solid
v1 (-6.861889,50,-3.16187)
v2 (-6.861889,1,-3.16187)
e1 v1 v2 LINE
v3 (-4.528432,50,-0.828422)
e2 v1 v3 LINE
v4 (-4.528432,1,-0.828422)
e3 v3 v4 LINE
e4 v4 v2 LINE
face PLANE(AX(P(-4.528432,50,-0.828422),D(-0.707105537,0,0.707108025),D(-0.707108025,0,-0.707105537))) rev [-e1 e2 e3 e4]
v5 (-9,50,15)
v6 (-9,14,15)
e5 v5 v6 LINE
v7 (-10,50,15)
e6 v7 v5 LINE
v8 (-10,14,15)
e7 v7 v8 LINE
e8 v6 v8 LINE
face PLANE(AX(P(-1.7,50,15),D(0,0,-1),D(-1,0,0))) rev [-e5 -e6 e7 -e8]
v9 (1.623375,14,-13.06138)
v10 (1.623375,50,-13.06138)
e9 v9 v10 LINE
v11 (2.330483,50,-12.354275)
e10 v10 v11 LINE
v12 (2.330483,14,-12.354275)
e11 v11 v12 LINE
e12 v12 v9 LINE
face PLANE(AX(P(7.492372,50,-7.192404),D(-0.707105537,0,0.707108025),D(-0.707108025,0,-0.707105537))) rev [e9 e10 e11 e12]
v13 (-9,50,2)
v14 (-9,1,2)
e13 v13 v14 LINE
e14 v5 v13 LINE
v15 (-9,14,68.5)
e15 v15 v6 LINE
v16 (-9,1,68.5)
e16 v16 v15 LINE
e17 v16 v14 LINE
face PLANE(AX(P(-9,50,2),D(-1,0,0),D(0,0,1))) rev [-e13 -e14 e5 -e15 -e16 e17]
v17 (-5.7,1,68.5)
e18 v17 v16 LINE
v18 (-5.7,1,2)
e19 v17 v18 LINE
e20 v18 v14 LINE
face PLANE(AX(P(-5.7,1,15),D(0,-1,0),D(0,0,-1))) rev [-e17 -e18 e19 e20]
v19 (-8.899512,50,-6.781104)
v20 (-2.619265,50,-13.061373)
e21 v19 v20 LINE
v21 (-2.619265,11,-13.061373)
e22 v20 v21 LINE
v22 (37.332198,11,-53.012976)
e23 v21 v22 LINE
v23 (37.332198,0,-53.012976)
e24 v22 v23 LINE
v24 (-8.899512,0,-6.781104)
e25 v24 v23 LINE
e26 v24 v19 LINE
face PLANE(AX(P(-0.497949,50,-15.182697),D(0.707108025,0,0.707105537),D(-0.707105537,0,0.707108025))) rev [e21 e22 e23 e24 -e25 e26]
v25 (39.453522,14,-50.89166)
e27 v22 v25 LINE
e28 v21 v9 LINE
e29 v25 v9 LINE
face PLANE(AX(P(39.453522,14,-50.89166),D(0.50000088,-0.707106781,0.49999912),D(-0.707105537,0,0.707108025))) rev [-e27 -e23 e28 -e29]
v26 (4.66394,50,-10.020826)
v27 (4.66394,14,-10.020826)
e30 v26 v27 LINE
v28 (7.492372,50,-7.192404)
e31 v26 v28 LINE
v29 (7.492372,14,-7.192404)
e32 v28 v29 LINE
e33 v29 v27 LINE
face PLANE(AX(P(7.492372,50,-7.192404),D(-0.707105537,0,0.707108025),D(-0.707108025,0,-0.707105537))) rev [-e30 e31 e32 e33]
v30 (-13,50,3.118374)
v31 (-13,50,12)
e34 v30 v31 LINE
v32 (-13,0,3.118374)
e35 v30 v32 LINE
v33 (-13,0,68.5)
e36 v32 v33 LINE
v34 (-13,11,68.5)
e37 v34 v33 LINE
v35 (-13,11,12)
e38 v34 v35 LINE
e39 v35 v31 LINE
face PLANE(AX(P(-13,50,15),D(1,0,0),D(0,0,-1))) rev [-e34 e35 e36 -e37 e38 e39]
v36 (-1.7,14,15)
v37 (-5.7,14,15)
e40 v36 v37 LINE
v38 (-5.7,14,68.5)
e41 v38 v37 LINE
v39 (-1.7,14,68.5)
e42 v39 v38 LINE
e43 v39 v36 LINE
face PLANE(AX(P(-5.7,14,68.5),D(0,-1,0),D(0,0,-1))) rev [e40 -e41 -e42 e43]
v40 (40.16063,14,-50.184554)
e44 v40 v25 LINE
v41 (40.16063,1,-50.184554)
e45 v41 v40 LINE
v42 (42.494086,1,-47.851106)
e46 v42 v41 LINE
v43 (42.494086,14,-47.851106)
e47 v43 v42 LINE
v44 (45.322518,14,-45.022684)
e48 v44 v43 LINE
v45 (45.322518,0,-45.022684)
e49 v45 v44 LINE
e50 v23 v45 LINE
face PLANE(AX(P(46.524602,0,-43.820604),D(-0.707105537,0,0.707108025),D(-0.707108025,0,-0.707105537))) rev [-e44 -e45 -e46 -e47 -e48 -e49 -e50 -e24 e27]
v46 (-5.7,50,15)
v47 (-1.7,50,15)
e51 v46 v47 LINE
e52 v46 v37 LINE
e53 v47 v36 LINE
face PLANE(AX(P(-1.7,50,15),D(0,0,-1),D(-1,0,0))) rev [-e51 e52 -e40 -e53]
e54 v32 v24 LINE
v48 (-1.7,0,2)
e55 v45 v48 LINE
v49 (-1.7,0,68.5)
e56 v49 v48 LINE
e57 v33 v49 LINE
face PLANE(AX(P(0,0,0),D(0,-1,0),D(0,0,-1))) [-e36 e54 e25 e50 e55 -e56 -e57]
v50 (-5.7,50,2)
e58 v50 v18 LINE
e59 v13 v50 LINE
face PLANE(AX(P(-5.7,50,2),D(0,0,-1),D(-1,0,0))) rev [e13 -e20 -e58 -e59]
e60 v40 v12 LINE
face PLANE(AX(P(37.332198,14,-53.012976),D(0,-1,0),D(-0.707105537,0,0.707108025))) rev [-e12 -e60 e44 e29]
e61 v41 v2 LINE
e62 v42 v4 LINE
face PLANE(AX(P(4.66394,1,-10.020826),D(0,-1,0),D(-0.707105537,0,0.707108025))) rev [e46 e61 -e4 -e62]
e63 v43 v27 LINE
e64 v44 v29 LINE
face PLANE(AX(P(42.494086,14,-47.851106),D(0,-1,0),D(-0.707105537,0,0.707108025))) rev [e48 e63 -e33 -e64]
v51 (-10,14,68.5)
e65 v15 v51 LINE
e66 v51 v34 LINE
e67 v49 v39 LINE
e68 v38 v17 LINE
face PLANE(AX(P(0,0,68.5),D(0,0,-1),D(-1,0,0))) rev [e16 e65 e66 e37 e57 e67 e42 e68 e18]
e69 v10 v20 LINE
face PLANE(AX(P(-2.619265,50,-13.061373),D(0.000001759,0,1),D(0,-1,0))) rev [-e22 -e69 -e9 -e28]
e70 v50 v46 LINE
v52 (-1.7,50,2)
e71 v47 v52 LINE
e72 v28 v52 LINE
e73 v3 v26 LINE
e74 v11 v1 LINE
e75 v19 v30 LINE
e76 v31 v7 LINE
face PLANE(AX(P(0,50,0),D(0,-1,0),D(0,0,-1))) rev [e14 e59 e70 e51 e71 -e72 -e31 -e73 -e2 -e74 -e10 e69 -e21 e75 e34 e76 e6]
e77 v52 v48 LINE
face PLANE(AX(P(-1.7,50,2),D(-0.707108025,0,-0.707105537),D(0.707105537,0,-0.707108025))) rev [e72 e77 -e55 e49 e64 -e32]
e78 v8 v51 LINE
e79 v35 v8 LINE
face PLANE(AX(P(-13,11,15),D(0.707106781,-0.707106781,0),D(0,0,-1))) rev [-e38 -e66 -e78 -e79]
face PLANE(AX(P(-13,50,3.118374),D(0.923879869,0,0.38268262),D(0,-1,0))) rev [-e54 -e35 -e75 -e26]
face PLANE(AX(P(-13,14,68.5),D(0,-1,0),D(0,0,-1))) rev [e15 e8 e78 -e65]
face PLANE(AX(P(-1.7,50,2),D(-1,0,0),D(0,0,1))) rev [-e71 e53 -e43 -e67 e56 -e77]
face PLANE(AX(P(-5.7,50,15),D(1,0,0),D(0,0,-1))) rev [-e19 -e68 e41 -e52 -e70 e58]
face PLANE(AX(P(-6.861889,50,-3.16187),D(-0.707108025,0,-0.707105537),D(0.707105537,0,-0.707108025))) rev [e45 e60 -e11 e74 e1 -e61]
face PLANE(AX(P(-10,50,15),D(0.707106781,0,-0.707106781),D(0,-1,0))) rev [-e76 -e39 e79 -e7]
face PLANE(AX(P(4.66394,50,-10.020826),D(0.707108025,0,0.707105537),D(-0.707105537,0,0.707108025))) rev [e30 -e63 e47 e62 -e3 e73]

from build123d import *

# Parameters (mm, degrees)
BOSS_EXTRUDE1_DEPTH = 50
SKETCH3_W           = 3.3
SKETCH3_H           = 1
BOSS_EXTRUDE2_DEPTH = 13
BOSS_EXTRUDE3_DEPTH = 53.5
CHAMFER1_START      = -14
CHAMFER1_OUTLINE_W  = 52
CHAMFER1_OUTLINE_H  = 13
CHAMFER1_DEPTH      = 3.182909169
CHAMFER2_SIZE       = 3


with BuildPart() as part:
    # Sketch2 → Boss-Extrude1 (new body)
    with BuildSketch(Plane(origin=(0, 0, 0), x_dir=(1, 0, 0), z_dir=(0, 1, 0))):
        Polygon((-1.7, -2), (-1.7, -15), (-5.7, -15), (-5.7, -2), (-9, -2), (-9, -15), (-13, -15), (-13, 2.680601608), align=None)
    extrude(amount=BOSS_EXTRUDE1_DEPTH)

    # Sketch3 → Boss-Extrude2 (add)
    with BuildSketch(Plane.XY.offset(2)):
        with Locations((-7.35, 0.5)):
            Rectangle(SKETCH3_W, SKETCH3_H)
    extrude(amount=BOSS_EXTRUDE2_DEPTH)

    # Sketch5 → Boss-Extrude3 (add)
    with BuildSketch(Plane.XY.offset(15)):
        Polygon((-13, 0), (-1.7, 0), (-1.7, 14), (-5.7, 14), (-5.7, 1), (-9, 1), (-9, 14), (-13, 14), align=None)
    extrude(amount=BOSS_EXTRUDE3_DEPTH)

    # Mirror1: part across plane


with BuildPart() as part_1:
    add(part.part)
    add(part.part.mirror(Plane(origin=(-0.956063716, 0, 2.308147732), x_dir=(0.9238798691632129, 0, 0.38268261961443256), z_dir=(0.3826826196144326, 0, -0.9238798691632131))))

    # Chamfer1: read off the stored shape, not the designer's step
    # Chamfer1 outline → Chamfer1 (cut)
    with BuildSketch(Plane(origin=(0, 0, 0), x_dir=(0, 1, 0), z_dir=(0.9238798691632129, 0, 0.38268261961443295)).offset(CHAMFER1_START)):
        with Locations((25, 2.5)):
            Rectangle(CHAMFER1_OUTLINE_W, CHAMFER1_OUTLINE_H)
    extrude(amount=CHAMFER1_DEPTH, mode=Mode.SUBTRACT)

    # Chamfer2
    chamfer2_edges = [part_1.edges().sort_by_distance(p)[0] for p in [
        (-13, 32, 15),
        (-13, 14, 41.75),
        (-0.497948704, 32, -15.182696898),
        (18.417124413, 14, -34.097836574),
    ]]
    chamfer(chamfer2_edges, length=CHAMFER2_SIZE)


solid = part_1.part
